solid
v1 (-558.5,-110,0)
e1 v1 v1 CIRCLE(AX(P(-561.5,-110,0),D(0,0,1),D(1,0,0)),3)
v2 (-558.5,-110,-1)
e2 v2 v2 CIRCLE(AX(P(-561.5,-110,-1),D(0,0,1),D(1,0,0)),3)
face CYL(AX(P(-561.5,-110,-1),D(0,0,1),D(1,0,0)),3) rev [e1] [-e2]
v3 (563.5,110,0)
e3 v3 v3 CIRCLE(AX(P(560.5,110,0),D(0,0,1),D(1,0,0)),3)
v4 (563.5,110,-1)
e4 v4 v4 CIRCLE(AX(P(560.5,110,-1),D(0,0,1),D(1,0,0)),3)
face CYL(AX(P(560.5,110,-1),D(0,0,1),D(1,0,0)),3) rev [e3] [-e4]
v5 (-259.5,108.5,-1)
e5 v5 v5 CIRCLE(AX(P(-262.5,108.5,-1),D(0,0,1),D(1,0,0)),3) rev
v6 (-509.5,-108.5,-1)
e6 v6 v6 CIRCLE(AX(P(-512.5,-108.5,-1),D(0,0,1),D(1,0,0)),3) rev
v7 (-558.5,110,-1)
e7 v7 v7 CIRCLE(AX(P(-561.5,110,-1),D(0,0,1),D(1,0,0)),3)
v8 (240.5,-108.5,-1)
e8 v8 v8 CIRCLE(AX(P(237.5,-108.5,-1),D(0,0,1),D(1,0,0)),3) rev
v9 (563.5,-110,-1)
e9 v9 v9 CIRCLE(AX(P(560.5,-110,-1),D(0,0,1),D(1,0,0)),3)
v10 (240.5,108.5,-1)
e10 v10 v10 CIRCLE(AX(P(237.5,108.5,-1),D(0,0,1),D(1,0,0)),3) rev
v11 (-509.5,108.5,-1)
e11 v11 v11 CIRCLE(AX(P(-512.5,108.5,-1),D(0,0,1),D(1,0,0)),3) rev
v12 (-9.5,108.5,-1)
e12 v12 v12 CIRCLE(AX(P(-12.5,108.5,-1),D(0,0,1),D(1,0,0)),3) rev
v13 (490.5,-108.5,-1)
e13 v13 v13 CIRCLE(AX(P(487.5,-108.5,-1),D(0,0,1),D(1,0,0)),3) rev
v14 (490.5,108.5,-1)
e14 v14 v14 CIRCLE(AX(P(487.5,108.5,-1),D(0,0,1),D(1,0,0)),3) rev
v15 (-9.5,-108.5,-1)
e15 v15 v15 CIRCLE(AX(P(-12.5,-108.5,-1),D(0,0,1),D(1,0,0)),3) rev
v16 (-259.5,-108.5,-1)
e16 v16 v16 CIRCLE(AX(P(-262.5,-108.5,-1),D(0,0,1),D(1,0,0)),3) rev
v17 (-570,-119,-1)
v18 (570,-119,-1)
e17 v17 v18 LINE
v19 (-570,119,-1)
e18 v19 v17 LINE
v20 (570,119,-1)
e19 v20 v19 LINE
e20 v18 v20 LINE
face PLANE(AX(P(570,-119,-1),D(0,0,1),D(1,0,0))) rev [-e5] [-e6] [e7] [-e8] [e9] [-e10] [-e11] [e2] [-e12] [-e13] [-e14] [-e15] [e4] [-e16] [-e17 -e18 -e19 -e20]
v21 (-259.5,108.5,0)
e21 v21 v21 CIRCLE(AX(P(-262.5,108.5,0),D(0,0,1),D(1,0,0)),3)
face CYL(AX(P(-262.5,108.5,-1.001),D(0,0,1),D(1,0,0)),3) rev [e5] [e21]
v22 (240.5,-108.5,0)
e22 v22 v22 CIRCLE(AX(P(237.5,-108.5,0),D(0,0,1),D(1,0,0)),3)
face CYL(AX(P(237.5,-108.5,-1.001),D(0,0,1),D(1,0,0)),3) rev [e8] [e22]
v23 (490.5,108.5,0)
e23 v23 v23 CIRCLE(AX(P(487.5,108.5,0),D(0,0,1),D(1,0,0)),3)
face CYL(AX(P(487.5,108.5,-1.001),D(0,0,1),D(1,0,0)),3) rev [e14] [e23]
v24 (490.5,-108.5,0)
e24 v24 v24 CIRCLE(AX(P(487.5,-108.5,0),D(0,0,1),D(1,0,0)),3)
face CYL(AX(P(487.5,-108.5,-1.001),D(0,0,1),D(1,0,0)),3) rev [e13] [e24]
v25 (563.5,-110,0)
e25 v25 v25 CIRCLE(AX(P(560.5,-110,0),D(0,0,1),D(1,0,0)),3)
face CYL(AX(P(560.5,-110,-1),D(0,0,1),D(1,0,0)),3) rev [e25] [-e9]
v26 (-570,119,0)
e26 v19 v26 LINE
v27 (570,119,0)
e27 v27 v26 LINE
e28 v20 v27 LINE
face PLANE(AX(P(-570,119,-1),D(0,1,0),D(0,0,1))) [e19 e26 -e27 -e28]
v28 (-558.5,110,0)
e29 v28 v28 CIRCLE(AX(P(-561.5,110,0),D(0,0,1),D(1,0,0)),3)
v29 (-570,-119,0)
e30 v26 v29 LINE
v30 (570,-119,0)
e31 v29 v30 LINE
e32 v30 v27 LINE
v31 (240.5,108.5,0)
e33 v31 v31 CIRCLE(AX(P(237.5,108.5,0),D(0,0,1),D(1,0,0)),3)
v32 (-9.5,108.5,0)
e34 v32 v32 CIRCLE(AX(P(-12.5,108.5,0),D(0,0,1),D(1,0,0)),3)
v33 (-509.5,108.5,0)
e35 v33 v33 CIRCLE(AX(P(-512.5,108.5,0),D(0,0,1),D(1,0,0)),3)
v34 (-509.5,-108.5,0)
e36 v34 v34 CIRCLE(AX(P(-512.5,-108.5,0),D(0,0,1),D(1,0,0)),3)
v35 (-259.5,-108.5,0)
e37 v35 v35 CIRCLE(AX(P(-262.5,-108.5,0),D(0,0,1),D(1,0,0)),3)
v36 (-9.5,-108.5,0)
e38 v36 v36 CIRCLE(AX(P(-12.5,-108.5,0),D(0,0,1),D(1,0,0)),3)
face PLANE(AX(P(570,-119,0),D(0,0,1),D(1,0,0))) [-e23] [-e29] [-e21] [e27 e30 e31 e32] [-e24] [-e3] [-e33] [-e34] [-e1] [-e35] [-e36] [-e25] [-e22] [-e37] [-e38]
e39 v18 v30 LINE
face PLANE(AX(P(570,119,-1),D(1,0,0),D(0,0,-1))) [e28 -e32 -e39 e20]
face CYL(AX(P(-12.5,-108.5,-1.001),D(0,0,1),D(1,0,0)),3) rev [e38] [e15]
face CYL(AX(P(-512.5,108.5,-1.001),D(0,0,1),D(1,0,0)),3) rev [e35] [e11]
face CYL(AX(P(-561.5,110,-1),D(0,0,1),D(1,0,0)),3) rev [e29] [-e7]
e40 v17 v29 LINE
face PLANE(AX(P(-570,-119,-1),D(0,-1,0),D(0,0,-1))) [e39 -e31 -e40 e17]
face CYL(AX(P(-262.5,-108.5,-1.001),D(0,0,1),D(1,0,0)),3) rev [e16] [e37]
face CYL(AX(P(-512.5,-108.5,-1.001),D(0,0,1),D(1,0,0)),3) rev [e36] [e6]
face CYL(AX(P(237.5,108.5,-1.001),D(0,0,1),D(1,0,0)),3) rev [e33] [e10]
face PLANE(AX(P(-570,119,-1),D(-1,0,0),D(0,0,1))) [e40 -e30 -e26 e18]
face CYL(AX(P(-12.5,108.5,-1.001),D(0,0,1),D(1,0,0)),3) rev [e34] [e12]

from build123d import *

# Parameters (mm, degrees)
SKETCH_1_W             = 1140
SKETCH_1_H             = 238
SKETCH_1_R             = 3
SM_BASE_FLANGE_1_DEPTH = 1
CUT_EXTRUDE_1_REACH    = 584.29
SKETCH_3_R             = 3


# Sheet-metal steps are written as plain solids
with BuildPart() as part:
    # Sketch 1 → 基体-法兰1 (new body)
    with BuildSketch(Plane.XY):
        Rectangle(SKETCH_1_W, SKETCH_1_H)
        with Locations((-561.5, 110)):
            Circle(SKETCH_1_R, mode=Mode.SUBTRACT)
        with Locations((-561.5, -110)):
            Circle(SKETCH_1_R, mode=Mode.SUBTRACT)
        with Locations((560.5, 110)):
            Circle(SKETCH_1_R, mode=Mode.SUBTRACT)
        with Locations((560.5, -110)):
            Circle(SKETCH_1_R, mode=Mode.SUBTRACT)
    extrude(amount=-SM_BASE_FLANGE_1_DEPTH)

    # 草图3 → 切除-拉伸1 (cut, up to next)
    with BuildSketch(Plane.XY, mode=Mode.PRIVATE) as cut_extrude_1_sk1:
        with Locations((-512.5, 108.5)):
            Circle(SKETCH_3_R)
    cut_extrude_1_tool1 = extrude(cut_extrude_1_sk1.sketch, amount=-CUT_EXTRUDE_1_REACH, mode=Mode.PRIVATE) & part.part
    # 草图3 → 切除-拉伸1 (cut, up to next)
    with BuildSketch(Plane.XY, mode=Mode.PRIVATE) as cut_extrude_1_sk2:
        with Locations((-262.5, 108.5)):
            Circle(SKETCH_3_R)
    cut_extrude_1_tool2 = extrude(cut_extrude_1_sk2.sketch, amount=-CUT_EXTRUDE_1_REACH, mode=Mode.PRIVATE) & part.part
    # 草图3 → 切除-拉伸1 (cut, up to next)
    with BuildSketch(Plane.XY, mode=Mode.PRIVATE) as cut_extrude_1_sk3:
        with Locations((-12.5, 108.5)):
            Circle(SKETCH_3_R)
    cut_extrude_1_tool3 = extrude(cut_extrude_1_sk3.sketch, amount=-CUT_EXTRUDE_1_REACH, mode=Mode.PRIVATE) & part.part
    # 草图3 → 切除-拉伸1 (cut, up to next)
    with BuildSketch(Plane.XY, mode=Mode.PRIVATE) as cut_extrude_1_sk4:
        with Locations((237.5, 108.5)):
            Circle(SKETCH_3_R)
    cut_extrude_1_tool4 = extrude(cut_extrude_1_sk4.sketch, amount=-CUT_EXTRUDE_1_REACH, mode=Mode.PRIVATE) & part.part
    # 草图3 → 切除-拉伸1 (cut, up to next)
    with BuildSketch(Plane.XY, mode=Mode.PRIVATE) as cut_extrude_1_sk5:
        with Locations((487.5, 108.5)):
            Circle(SKETCH_3_R)
    cut_extrude_1_tool5 = extrude(cut_extrude_1_sk5.sketch, amount=-CUT_EXTRUDE_1_REACH, mode=Mode.PRIVATE) & part.part
    # 草图3 → 切除-拉伸1 (cut, up to next)
    with BuildSketch(Plane.XY, mode=Mode.PRIVATE) as cut_extrude_1_sk6:
        with Locations((-512.5, -108.5)):
            Circle(SKETCH_3_R)
    cut_extrude_1_tool6 = extrude(cut_extrude_1_sk6.sketch, amount=-CUT_EXTRUDE_1_REACH, mode=Mode.PRIVATE) & part.part
    # 草图3 → 切除-拉伸1 (cut, up to next)
    with BuildSketch(Plane.XY, mode=Mode.PRIVATE) as cut_extrude_1_sk7:
        with Locations((-262.5, -108.5)):
            Circle(SKETCH_3_R)
    cut_extrude_1_tool7 = extrude(cut_extrude_1_sk7.sketch, amount=-CUT_EXTRUDE_1_REACH, mode=Mode.PRIVATE) & part.part
    # 草图3 → 切除-拉伸1 (cut, up to next)
    with BuildSketch(Plane.XY, mode=Mode.PRIVATE) as cut_extrude_1_sk8:
        with Locations((-12.5, -108.5)):
            Circle(SKETCH_3_R)
    cut_extrude_1_tool8 = extrude(cut_extrude_1_sk8.sketch, amount=-CUT_EXTRUDE_1_REACH, mode=Mode.PRIVATE) & part.part
    # 草图3 → 切除-拉伸1 (cut, up to next)
    with BuildSketch(Plane.XY, mode=Mode.PRIVATE) as cut_extrude_1_sk9:
        with Locations((237.5, -108.5)):
            Circle(SKETCH_3_R)
    cut_extrude_1_tool9 = extrude(cut_extrude_1_sk9.sketch, amount=-CUT_EXTRUDE_1_REACH, mode=Mode.PRIVATE) & part.part
    # 草图3 → 切除-拉伸1 (cut, up to next)
    with BuildSketch(Plane.XY, mode=Mode.PRIVATE) as cut_extrude_1_sk10:
        with Locations((487.5, -108.5)):
            Circle(SKETCH_3_R)
    cut_extrude_1_tool10 = extrude(cut_extrude_1_sk10.sketch, amount=-CUT_EXTRUDE_1_REACH, mode=Mode.PRIVATE) & part.part
    add(cut_extrude_1_tool1.solids().sort_by_distance((-512.5, 108.5, 0))[0], mode=Mode.SUBTRACT)
    add(cut_extrude_1_tool2.solids().sort_by_distance((-262.5, 108.5, 0))[0], mode=Mode.SUBTRACT)
    add(cut_extrude_1_tool3.solids().sort_by_distance((-12.5, 108.5, 0))[0], mode=Mode.SUBTRACT)
    add(cut_extrude_1_tool4.solids().sort_by_distance((237.5, 108.5, 0))[0], mode=Mode.SUBTRACT)
    add(cut_extrude_1_tool5.solids().sort_by_distance((487.5, 108.5, 0))[0], mode=Mode.SUBTRACT)
    add(cut_extrude_1_tool6.solids().sort_by_distance((-512.5, -108.5, 0))[0], mode=Mode.SUBTRACT)
    add(cut_extrude_1_tool7.solids().sort_by_distance((-262.5, -108.5, 0))[0], mode=Mode.SUBTRACT)
    add(cut_extrude_1_tool8.solids().sort_by_distance((-12.5, -108.5, 0))[0], mode=Mode.SUBTRACT)
    add(cut_extrude_1_tool9.solids().sort_by_distance((237.5, -108.5, 0))[0], mode=Mode.SUBTRACT)
    add(cut_extrude_1_tool10.solids().sort_by_distance((487.5, -108.5, 0))[0], mode=Mode.SUBTRACT)


solid = part.part
